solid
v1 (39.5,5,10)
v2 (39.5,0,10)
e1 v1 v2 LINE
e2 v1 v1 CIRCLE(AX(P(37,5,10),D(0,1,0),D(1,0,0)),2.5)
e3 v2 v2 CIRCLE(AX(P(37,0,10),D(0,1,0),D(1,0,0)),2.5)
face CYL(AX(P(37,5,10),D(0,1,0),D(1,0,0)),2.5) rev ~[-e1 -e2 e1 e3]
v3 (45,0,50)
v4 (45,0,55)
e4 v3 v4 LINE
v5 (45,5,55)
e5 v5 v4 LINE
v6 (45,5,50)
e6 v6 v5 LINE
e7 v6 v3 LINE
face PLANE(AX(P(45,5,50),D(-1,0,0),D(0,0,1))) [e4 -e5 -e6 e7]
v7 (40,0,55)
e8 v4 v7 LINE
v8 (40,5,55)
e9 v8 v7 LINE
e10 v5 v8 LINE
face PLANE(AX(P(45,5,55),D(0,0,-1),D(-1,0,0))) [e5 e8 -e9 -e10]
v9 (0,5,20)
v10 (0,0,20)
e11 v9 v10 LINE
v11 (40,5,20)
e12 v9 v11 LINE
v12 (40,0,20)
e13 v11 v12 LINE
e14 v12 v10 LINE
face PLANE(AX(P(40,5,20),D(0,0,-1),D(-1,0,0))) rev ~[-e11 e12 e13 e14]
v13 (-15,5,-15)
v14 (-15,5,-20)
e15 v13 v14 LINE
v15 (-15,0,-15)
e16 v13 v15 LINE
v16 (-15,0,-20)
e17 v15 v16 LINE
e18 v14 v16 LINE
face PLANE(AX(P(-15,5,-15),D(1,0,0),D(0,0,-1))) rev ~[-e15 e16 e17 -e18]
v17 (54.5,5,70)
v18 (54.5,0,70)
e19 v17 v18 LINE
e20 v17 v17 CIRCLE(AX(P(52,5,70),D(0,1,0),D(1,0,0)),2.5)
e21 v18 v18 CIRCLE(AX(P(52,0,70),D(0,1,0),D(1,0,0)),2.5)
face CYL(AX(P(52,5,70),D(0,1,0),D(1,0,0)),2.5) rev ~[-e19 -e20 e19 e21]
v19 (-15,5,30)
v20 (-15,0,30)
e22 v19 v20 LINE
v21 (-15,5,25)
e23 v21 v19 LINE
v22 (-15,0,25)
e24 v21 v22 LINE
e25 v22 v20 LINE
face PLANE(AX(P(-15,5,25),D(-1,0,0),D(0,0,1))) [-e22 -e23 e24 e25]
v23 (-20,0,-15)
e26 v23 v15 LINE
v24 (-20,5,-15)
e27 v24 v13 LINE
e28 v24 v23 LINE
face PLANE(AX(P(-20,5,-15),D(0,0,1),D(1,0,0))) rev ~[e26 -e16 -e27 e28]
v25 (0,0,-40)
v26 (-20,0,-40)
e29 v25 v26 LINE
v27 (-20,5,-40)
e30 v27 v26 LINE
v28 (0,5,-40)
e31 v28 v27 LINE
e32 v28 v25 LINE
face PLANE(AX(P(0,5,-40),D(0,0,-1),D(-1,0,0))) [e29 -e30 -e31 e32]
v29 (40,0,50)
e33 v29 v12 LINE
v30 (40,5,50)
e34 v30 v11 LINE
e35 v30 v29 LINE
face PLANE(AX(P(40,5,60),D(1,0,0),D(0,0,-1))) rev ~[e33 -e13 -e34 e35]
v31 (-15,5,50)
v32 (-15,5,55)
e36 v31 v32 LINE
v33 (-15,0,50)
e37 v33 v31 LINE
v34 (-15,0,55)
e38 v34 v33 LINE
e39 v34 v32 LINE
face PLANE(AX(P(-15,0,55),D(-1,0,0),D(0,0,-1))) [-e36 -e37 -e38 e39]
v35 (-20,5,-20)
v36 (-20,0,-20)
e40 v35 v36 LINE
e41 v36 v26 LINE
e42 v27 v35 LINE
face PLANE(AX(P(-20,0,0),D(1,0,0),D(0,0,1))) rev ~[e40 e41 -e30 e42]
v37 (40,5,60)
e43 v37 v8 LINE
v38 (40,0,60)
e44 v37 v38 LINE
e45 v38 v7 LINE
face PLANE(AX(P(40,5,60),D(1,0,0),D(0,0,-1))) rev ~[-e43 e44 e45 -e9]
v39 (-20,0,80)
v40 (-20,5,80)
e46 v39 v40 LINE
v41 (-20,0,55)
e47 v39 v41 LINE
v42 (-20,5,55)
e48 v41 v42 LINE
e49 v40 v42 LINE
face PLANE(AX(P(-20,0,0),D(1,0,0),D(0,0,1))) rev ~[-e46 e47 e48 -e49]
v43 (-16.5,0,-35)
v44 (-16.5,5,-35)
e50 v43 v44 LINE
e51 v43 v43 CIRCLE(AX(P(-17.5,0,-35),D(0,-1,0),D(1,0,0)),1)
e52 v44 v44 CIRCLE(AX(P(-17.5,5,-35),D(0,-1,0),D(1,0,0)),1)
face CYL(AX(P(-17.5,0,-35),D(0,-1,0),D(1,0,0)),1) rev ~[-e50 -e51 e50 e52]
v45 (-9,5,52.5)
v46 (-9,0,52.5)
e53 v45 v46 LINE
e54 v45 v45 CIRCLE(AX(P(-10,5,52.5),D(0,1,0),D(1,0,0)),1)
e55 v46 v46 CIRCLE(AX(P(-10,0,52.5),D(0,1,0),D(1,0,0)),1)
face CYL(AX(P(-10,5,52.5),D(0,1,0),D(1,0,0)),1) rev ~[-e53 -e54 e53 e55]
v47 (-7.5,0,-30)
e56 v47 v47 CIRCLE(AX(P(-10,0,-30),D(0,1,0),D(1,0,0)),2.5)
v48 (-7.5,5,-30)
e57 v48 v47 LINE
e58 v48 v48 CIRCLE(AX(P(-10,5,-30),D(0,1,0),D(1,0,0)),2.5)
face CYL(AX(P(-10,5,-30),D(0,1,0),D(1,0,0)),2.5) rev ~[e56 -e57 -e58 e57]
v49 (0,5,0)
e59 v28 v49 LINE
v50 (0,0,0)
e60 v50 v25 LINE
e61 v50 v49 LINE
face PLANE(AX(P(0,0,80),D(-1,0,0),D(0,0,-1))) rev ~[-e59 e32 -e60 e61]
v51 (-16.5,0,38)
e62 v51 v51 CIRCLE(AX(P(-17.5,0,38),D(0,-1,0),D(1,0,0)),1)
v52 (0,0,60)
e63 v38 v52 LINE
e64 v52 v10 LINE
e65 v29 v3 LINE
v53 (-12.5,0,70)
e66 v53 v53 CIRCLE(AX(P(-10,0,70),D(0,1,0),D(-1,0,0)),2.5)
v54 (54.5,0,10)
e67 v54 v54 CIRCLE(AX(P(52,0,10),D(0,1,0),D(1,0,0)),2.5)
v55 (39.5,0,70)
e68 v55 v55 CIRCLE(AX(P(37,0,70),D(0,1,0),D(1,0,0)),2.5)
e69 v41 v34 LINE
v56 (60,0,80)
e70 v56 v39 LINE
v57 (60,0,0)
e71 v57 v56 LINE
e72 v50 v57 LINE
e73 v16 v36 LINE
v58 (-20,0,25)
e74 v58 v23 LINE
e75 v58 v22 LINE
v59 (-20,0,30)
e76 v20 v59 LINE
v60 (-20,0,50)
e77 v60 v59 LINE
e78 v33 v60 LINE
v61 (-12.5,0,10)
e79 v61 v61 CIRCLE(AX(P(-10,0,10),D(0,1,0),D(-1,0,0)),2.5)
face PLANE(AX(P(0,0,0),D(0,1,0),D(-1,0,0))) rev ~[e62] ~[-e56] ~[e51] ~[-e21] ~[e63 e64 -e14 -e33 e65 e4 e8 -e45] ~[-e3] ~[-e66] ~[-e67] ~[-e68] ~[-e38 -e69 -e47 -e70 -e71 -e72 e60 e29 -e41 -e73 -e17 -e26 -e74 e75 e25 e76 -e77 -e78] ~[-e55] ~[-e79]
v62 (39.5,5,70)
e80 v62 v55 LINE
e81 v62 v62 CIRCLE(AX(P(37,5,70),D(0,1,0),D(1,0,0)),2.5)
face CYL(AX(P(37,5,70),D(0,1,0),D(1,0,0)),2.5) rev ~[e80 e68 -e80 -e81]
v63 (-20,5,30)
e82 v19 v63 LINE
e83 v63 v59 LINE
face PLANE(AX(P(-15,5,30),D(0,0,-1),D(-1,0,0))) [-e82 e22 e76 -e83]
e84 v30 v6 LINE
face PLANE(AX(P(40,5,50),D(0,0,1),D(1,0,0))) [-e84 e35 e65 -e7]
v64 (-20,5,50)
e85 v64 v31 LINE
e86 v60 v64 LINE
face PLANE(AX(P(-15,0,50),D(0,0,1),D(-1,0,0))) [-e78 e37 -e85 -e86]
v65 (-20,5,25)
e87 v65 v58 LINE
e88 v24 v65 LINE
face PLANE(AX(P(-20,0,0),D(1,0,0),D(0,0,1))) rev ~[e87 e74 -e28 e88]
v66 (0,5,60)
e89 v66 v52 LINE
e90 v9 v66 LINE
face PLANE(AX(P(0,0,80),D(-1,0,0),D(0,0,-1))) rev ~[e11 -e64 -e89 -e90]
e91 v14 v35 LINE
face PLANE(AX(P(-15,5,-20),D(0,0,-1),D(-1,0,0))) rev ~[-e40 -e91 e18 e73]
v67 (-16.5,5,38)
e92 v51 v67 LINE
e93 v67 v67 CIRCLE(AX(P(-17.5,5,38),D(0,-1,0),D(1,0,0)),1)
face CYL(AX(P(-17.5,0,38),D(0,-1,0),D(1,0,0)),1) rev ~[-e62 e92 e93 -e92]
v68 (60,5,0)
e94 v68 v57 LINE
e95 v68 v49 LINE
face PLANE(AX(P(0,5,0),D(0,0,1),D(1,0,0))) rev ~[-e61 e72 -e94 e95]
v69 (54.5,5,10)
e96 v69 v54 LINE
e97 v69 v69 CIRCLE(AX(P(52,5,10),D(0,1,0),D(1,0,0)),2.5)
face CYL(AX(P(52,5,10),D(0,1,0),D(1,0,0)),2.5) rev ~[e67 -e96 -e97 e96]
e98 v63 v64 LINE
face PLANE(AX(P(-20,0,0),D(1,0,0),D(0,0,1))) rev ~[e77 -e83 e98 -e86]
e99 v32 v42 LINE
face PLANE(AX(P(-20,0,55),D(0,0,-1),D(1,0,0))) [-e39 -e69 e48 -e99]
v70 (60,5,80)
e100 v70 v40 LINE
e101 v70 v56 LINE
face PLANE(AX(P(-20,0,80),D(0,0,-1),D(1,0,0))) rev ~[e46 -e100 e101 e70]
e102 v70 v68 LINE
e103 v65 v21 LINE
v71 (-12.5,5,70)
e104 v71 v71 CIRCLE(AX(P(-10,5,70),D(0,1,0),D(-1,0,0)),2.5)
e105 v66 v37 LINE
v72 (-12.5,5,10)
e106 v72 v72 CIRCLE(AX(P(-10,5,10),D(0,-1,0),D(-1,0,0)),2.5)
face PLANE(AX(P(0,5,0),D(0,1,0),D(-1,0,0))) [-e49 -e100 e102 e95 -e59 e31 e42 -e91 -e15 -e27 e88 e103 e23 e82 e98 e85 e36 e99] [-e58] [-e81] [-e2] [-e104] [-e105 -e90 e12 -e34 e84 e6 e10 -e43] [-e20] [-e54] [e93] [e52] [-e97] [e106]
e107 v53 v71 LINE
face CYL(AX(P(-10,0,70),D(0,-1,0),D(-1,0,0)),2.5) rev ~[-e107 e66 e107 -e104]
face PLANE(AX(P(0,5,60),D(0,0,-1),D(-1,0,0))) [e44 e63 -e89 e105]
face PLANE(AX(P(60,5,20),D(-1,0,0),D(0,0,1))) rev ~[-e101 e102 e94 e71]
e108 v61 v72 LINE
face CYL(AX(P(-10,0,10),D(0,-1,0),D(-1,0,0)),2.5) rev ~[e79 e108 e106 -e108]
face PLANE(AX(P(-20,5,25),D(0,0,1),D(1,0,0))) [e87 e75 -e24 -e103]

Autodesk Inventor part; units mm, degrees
ref_plane "YZ Plane" through (0, 0, 0) normal (1, 0, 0) x (0, 1, 0)
ref_plane "XZ Plane" through (0, 0, 0) normal (0, 1, 0) x (-1, 0, 0)
ref_plane "XY Plane" through (0, 0, 0) normal (0, 0, 1) x (1, 0, 0)
sketch "Sketch4" plane through (0, 0, 0) normal (0, 1, 0) x (-1, 0, 0)
  line L0 (0, 0) -> (20, 0)
  line L1 (20, 0) -> (20, 80)
  line L2 (20, 80) -> (0, 80)
  line L3 (0, 80) -> (0, 0)
  circle A0 centre (10, 10) radius 2.5
  circle A1 centre (10, 70) radius 2.5
  circle A2 centre (10, 70) radius 2.5
  line L4 (0, 0) -> (20, 0)
  line L5 (20, 0) -> (20, -40)
  line L6 (20, -40) -> (0, -40)
  line L7 (0, -40) -> (0, 0)
  circle A3 centre (10, -30) radius 2.5
  dimension "d0" = 80
  dimension "d3" = 20
  dimension "d4" = 5
  dimension "d5" = 10
  dimension "d6" = 10
  dimension "d7" = 5
  dimension "d8" = 10
  dimension "d9" = 10
  dimension "d12" = 5
  dimension "d13" = 60
  dimension "d16" = 40
  dimension "d17" = 5
  dimension "d18" = 10
  dimension "d19" = 10
extrude "Extrusion3" add sketch "Sketch4" along normal blind 5 contours L3 L2 L1 L0
sketch "Sketch5" plane through (0, 5, 0) normal (0, 1, 0) x (1, 0, 0)
  line L0 (60, -20) -> (-20, -20) projected
  line L1 (-20, -20) -> (-20, 0) projected
  line L2 (60, -20) -> (-20, -20) projected
  line L3 (60, 0) -> (60, -20) projected
  line L4 (-20, 0) -> (60, 0) projected
  circle A0 centre (-10, -70) radius 2.5 projected
  circle A1 centre (-10, -10) radius 2.5 projected
  line L5 (0, 0) -> (-20, 0) projected
  line L6 (-20, 0) -> (-20, -80) projected
  line L7 (-20, -80) -> (0, -80) projected
  line L8 (0, -80) -> (0, 0) projected
  line L9 (-20, 0) -> (0, 0)
  line L10 (0, 0) -> (0, 40)
  line L11 (0, 40) -> (-20, 40)
  line L12 (-20, 40) -> (-20, 0)
  circle A2 centre (-10, 30) radius 2.5
  circle A3 centre (50, -10) radius 2.5 projected
  circle A4 centre (-10, -10) radius 2.5 projected
  circle A5 centre (35, -10) radius 2.5 projected
  dimension "d20" = 40
  dimension "d21" = 5
  dimension "d22" = 10
  dimension "d23" = 10
extrude "Extrusion4" add sketch "Sketch5" against normal blind 5 contours L4 L12 L11 L10
sketch "Sketch6" plane through (0, 5, 0) normal (0, 1, 0) x (1, 0, 0)
  line L0 (-20, 15) -> (-15, 15)
  line L1 (-15, 15) -> (-15, 20)
  line L2 (-15, 20) -> (-20, 20)
  line L3 (-20, 20) -> (-20, 15)
  line L4 (-20, 15) -> (-15, 20) construction
  line L5 (-15, 15) -> (-20, 20) construction
  line L6 (0, 40) -> (-20, 40) projected
  line L7 (-20, 40) -> (-20, -80) projected
  line L8 (-20, -25) -> (-15, -25)
  line L9 (-15, -25) -> (-15, -30)
  line L10 (-15, -30) -> (-20, -30)
  line L11 (-20, -30) -> (-20, -25)
  line L12 (-20, -25) -> (-15, -30) construction
  line L13 (-15, -25) -> (-20, -30) construction
  point P0 (0, 0)
  point P1 (-17.5, 17.5)
  point P2 (-17.5, -27.5)
  dimension "d26" = 5
  dimension "d27" = 5
  dimension "d28" = 20
  dimension "d29" = 5
  dimension "d30" = 5
  dimension "d31" = 40
extrude "Extrusion5" cut sketch "Sketch6" against normal through all
sketch "Sketch7" plane through (0, 5, 0) normal (0, 1, 0) x (1, 0, 0)
  circle A0 centre (-10, -52.5) radius 1
  line L0 (-20, -30) -> (-20, -80) projected
  line L1 (0, 40) -> (-20, 40) projected
  point P0 (0, 0)
  dimension "d34" = 2
  dimension "d35" = 10
  dimension "d36" = 92.5
extrude "Extrusion6" cut sketch "Sketch7" against normal through all
sketch "Sketch8" plane through (0, 0, 0) normal (0, -1, 0) x (1, 0, 0)
  circle A0 centre (-17.5, -35) radius 1
  line L0 (-20, -20) -> (-20, -40) projected
  line L1 (-20, -40) -> (0, -40) projected
  point P0 (0, 0)
  dimension "d39" = 2
  dimension "d40" = 2.5
  dimension "d41" = 5
extrude "Extrusion7" cut sketch "Sketch8" against normal through all
sketch "Sketch9" plane through (0, 0, 0) normal (0, -1, 0) x (1, 0, 0)
  circle A0 centre (-17.5, 38) radius 1
  line L0 (-20, 80) -> (-20, 30) projected
  line L1 (-20, 30) -> (-15, 30) projected
  point P0 (0, 0)
  dimension "d44" = 2
  dimension "d45" = 2.5
  dimension "d46" = 8
extrude "Extrusion8" cut sketch "Sketch9" against normal through all
sketch "Sketch10" plane through (0, 5, 0) normal (0, 1, 0) x (1, 0, 0)
  circle A0 centre (50, -70) radius 2.5 projected
  circle A1 centre (-10, -70) radius 2.5 projected
  circle A2 centre (35, -70) radius 2.5 projected
  line L0 (-20, -80) -> (-20, -60) projected
  line L1 (60, -80) -> (-20, -80) projected
  line L2 (60, -60) -> (60, -80) projected
  line L3 (-20, -60) -> (60, -60) projected
  circle A3 centre (50, -10) radius 2.5 projected
  circle A4 centre (35, -10) radius 2.5 projected
  circle A5 centre (50, -70) radius 2.5 projected
  circle A6 centre (35, -70) radius 2.5 projected
  line L4 (57, 0) -> (27, 0) projected
  line L5 (27, 0) -> (27, -80) projected
  line L6 (27, -80) -> (57, -80) projected
  line L7 (57, -80) -> (57, 0) projected
  circle A7 centre (50, -10) radius 2.5 projected
  circle A8 centre (-10, -10) radius 2.5 projected
  circle A9 centre (35, -10) radius 2.5 projected
  line L8 (-20, -20) -> (-20, 0) projected
  line L9 (60, -20) -> (-20, -20) projected
  line L10 (60, 0) -> (60, -20) projected
  line L11 (-20, 0) -> (60, 0) projected
  line L12 (-20, -80) -> (57, -80)
  line L13 (57, -80) -> (57, -60)
  line L14 (57, -60) -> (-20, -60)
  line L15 (-20, -60) -> (-20, -80)
  line L16 (57, 0) -> (27, 0)
  line L17 (27, 0) -> (27, -80)
  line L18 (27, -80) -> (57, -80)
  line L19 (57, -80) -> (57, 0)
  line L20 (-20, 0) -> (57, 0)
  line L21 (57, 0) -> (57, -20)
  line L22 (57, -20) -> (-20, -20)
  line L23 (-20, -20) -> (-20, 0)
  point P0 (0, 0)
extrude "Extrusion9" [suppressed]
sketch "Sketch11" plane through (0, 0, 0) normal (0, -1, 0) x (1, 0, 0)
  line L0 (-20, 55) -> (-15, 55)
  line L1 (-15, 55) -> (-15, 50)
  line L2 (-15, 50) -> (-20, 50)
  line L3 (-20, 50) -> (-20, 55)
  line L4 (-20, 80) -> (0, 80) projected
  line L5 (-20, 80) -> (-20, 30) projected
  point P0 (0, 0)
  point P1 (57, 80)
  dimension "d51" = 5
  dimension "d52" = 5
  dimension "d53" = 25
extrude "Extrusion10" cut sketch "Sketch11" against normal through all
sketch "Sketch12" plane through (0, 0, 0) normal (0, -1, 0) x (1, 0, 0)
  line L0 (27, 50) -> (32, 50)
  line L1 (32, 50) -> (32, 55)
  line L2 (32, 55) -> (27, 55)
  line L3 (27, 55) -> (27, 50)
  line L4 (-20, 80) -> (-20, 55) projected
  line L5 (-20, 80) -> (0, 80) projected
  point P0 (0, 0)
  point P1 (57, 80)
  dimension "d56" = 5
  dimension "d57" = 5
  dimension "d58" = 47
  dimension "d59" = 25
sketch "Sketch15" plane through (0, 5, 0) normal (0, 1, 0) x (1, 0, 0)
  line L0 (-12.5, -55) -> (-12.5, -103) projected
  line L1 (-5.379, -59) -> (-8.621, -59) projected
  circle A0 centre (-10, -10) radius 2.5 projected
  circle A1 centre (-10, -70) radius 2.5 projected
  circle A2 centre (-10, 30) radius 2.5 projected
  line L2 (-20, -50) -> (-15, -50) projected
  line L3 (-15, -50) -> (-15, -55) projected
  line L4 (-15, -55) -> (-20, -55) projected
  line L5 (-20, -55) -> (-20, -80) projected
  line L6 (-20, -80) -> (0, -80) projected
  line L7 (0, -80) -> (0, 40) projected
  line L8 (0, 40) -> (-20, 40) projected
  line L9 (-20, 20) -> (-15, 20) projected
  line L10 (-15, 20) -> (-15, 15) projected
  line L11 (-15, 15) -> (-20, 15) projected
  line L12 (-20, 15) -> (-20, -25) projected
  line L13 (-20, -25) -> (-15, -25) projected
  line L14 (-15, -25) -> (-15, -30) projected
  line L15 (-15, -30) -> (-20, -30) projected
  line L16 (-20, -30) -> (-20, -50) projected
  circle A3 centre (-10, -52.5) radius 1 projected
  circle A4 centre (-17.5, 35) radius 1 projected
  circle A5 centre (-17.5, -38) radius 1 projected
  line L17 (-20, -80) -> (60, -80)
  line L18 (60, -80) -> (60, -60)
  line L19 (60, -60) -> (-20, -60)
  line L20 (-20, -60) -> (-20, -80)
  line L21 (60, -80) -> (40, -80)
  line L22 (40, -80) -> (40, 0)
  line L23 (40, 0) -> (60, 0)
  line L24 (60, 0) -> (60, -80)
  line L25 (-20, 0) -> (60, 0)
  line L26 (60, 0) -> (60, -20)
  line L27 (60, -20) -> (-20, -20)
  line L28 (-20, -20) -> (-20, 0)
  circle A6 centre (37, -70) radius 2.5
  circle A7 centre (52, -70) radius 2.5
  circle A8 centre (52, -10) radius 2.5
  circle A9 centre (37, -10) radius 2.5
  line L29 (-20, 40) -> (-20, 20) projected
  point P0 (0, 0)
  dimension "d69" = 20
  dimension "d70" = 80
  dimension "d71" = 20
  dimension "d72" = 80
  dimension "d73" = 5
  dimension "d74" = 5
  dimension "d75" = 8
  dimension "d76" = 23
  dimension "d77" = 5
  dimension "d78" = 5
  dimension "d79" = 8
  dimension "d80" = 23
  dimension "d81" = 10
  dimension "d82" = 10
  dimension "d90" = 20
extrude "Extrusion14" add sketch "Sketch15" against normal blind 5 contours L19 L7 L6 L0 | L0 L6 L5 L19 | L19 L22 L17 L7 | L27 L12 L25 L7 | L7 L25 L22 L27 | L22 L27 L24 L19 | L19 L18 L17 L22 | L22 L23 L24 L27
sketch "Sketch16" plane through (0, 5, 0) normal (0, 1, 0) x (1, 0, 0)
  line L0 (45, -55) -> (40, -55)
  line L1 (40, -55) -> (40, -50)
  line L2 (40, -50) -> (45, -50)
  line L3 (45, -50) -> (45, -55)
  line L4 (40, -20) -> (40, -60) projected
  line L5 (-20, -80) -> (60, -80) projected
  point P0 (0, 0)
  dimension "d85" = 5
  dimension "d86" = 5
  dimension "d87" = 25
extrude "Extrusion15" cut sketch "Sketch16" against normal through all
equation "\"d37\" = d36"
properties part number "holdersupport" material "Wood (Birch)"
